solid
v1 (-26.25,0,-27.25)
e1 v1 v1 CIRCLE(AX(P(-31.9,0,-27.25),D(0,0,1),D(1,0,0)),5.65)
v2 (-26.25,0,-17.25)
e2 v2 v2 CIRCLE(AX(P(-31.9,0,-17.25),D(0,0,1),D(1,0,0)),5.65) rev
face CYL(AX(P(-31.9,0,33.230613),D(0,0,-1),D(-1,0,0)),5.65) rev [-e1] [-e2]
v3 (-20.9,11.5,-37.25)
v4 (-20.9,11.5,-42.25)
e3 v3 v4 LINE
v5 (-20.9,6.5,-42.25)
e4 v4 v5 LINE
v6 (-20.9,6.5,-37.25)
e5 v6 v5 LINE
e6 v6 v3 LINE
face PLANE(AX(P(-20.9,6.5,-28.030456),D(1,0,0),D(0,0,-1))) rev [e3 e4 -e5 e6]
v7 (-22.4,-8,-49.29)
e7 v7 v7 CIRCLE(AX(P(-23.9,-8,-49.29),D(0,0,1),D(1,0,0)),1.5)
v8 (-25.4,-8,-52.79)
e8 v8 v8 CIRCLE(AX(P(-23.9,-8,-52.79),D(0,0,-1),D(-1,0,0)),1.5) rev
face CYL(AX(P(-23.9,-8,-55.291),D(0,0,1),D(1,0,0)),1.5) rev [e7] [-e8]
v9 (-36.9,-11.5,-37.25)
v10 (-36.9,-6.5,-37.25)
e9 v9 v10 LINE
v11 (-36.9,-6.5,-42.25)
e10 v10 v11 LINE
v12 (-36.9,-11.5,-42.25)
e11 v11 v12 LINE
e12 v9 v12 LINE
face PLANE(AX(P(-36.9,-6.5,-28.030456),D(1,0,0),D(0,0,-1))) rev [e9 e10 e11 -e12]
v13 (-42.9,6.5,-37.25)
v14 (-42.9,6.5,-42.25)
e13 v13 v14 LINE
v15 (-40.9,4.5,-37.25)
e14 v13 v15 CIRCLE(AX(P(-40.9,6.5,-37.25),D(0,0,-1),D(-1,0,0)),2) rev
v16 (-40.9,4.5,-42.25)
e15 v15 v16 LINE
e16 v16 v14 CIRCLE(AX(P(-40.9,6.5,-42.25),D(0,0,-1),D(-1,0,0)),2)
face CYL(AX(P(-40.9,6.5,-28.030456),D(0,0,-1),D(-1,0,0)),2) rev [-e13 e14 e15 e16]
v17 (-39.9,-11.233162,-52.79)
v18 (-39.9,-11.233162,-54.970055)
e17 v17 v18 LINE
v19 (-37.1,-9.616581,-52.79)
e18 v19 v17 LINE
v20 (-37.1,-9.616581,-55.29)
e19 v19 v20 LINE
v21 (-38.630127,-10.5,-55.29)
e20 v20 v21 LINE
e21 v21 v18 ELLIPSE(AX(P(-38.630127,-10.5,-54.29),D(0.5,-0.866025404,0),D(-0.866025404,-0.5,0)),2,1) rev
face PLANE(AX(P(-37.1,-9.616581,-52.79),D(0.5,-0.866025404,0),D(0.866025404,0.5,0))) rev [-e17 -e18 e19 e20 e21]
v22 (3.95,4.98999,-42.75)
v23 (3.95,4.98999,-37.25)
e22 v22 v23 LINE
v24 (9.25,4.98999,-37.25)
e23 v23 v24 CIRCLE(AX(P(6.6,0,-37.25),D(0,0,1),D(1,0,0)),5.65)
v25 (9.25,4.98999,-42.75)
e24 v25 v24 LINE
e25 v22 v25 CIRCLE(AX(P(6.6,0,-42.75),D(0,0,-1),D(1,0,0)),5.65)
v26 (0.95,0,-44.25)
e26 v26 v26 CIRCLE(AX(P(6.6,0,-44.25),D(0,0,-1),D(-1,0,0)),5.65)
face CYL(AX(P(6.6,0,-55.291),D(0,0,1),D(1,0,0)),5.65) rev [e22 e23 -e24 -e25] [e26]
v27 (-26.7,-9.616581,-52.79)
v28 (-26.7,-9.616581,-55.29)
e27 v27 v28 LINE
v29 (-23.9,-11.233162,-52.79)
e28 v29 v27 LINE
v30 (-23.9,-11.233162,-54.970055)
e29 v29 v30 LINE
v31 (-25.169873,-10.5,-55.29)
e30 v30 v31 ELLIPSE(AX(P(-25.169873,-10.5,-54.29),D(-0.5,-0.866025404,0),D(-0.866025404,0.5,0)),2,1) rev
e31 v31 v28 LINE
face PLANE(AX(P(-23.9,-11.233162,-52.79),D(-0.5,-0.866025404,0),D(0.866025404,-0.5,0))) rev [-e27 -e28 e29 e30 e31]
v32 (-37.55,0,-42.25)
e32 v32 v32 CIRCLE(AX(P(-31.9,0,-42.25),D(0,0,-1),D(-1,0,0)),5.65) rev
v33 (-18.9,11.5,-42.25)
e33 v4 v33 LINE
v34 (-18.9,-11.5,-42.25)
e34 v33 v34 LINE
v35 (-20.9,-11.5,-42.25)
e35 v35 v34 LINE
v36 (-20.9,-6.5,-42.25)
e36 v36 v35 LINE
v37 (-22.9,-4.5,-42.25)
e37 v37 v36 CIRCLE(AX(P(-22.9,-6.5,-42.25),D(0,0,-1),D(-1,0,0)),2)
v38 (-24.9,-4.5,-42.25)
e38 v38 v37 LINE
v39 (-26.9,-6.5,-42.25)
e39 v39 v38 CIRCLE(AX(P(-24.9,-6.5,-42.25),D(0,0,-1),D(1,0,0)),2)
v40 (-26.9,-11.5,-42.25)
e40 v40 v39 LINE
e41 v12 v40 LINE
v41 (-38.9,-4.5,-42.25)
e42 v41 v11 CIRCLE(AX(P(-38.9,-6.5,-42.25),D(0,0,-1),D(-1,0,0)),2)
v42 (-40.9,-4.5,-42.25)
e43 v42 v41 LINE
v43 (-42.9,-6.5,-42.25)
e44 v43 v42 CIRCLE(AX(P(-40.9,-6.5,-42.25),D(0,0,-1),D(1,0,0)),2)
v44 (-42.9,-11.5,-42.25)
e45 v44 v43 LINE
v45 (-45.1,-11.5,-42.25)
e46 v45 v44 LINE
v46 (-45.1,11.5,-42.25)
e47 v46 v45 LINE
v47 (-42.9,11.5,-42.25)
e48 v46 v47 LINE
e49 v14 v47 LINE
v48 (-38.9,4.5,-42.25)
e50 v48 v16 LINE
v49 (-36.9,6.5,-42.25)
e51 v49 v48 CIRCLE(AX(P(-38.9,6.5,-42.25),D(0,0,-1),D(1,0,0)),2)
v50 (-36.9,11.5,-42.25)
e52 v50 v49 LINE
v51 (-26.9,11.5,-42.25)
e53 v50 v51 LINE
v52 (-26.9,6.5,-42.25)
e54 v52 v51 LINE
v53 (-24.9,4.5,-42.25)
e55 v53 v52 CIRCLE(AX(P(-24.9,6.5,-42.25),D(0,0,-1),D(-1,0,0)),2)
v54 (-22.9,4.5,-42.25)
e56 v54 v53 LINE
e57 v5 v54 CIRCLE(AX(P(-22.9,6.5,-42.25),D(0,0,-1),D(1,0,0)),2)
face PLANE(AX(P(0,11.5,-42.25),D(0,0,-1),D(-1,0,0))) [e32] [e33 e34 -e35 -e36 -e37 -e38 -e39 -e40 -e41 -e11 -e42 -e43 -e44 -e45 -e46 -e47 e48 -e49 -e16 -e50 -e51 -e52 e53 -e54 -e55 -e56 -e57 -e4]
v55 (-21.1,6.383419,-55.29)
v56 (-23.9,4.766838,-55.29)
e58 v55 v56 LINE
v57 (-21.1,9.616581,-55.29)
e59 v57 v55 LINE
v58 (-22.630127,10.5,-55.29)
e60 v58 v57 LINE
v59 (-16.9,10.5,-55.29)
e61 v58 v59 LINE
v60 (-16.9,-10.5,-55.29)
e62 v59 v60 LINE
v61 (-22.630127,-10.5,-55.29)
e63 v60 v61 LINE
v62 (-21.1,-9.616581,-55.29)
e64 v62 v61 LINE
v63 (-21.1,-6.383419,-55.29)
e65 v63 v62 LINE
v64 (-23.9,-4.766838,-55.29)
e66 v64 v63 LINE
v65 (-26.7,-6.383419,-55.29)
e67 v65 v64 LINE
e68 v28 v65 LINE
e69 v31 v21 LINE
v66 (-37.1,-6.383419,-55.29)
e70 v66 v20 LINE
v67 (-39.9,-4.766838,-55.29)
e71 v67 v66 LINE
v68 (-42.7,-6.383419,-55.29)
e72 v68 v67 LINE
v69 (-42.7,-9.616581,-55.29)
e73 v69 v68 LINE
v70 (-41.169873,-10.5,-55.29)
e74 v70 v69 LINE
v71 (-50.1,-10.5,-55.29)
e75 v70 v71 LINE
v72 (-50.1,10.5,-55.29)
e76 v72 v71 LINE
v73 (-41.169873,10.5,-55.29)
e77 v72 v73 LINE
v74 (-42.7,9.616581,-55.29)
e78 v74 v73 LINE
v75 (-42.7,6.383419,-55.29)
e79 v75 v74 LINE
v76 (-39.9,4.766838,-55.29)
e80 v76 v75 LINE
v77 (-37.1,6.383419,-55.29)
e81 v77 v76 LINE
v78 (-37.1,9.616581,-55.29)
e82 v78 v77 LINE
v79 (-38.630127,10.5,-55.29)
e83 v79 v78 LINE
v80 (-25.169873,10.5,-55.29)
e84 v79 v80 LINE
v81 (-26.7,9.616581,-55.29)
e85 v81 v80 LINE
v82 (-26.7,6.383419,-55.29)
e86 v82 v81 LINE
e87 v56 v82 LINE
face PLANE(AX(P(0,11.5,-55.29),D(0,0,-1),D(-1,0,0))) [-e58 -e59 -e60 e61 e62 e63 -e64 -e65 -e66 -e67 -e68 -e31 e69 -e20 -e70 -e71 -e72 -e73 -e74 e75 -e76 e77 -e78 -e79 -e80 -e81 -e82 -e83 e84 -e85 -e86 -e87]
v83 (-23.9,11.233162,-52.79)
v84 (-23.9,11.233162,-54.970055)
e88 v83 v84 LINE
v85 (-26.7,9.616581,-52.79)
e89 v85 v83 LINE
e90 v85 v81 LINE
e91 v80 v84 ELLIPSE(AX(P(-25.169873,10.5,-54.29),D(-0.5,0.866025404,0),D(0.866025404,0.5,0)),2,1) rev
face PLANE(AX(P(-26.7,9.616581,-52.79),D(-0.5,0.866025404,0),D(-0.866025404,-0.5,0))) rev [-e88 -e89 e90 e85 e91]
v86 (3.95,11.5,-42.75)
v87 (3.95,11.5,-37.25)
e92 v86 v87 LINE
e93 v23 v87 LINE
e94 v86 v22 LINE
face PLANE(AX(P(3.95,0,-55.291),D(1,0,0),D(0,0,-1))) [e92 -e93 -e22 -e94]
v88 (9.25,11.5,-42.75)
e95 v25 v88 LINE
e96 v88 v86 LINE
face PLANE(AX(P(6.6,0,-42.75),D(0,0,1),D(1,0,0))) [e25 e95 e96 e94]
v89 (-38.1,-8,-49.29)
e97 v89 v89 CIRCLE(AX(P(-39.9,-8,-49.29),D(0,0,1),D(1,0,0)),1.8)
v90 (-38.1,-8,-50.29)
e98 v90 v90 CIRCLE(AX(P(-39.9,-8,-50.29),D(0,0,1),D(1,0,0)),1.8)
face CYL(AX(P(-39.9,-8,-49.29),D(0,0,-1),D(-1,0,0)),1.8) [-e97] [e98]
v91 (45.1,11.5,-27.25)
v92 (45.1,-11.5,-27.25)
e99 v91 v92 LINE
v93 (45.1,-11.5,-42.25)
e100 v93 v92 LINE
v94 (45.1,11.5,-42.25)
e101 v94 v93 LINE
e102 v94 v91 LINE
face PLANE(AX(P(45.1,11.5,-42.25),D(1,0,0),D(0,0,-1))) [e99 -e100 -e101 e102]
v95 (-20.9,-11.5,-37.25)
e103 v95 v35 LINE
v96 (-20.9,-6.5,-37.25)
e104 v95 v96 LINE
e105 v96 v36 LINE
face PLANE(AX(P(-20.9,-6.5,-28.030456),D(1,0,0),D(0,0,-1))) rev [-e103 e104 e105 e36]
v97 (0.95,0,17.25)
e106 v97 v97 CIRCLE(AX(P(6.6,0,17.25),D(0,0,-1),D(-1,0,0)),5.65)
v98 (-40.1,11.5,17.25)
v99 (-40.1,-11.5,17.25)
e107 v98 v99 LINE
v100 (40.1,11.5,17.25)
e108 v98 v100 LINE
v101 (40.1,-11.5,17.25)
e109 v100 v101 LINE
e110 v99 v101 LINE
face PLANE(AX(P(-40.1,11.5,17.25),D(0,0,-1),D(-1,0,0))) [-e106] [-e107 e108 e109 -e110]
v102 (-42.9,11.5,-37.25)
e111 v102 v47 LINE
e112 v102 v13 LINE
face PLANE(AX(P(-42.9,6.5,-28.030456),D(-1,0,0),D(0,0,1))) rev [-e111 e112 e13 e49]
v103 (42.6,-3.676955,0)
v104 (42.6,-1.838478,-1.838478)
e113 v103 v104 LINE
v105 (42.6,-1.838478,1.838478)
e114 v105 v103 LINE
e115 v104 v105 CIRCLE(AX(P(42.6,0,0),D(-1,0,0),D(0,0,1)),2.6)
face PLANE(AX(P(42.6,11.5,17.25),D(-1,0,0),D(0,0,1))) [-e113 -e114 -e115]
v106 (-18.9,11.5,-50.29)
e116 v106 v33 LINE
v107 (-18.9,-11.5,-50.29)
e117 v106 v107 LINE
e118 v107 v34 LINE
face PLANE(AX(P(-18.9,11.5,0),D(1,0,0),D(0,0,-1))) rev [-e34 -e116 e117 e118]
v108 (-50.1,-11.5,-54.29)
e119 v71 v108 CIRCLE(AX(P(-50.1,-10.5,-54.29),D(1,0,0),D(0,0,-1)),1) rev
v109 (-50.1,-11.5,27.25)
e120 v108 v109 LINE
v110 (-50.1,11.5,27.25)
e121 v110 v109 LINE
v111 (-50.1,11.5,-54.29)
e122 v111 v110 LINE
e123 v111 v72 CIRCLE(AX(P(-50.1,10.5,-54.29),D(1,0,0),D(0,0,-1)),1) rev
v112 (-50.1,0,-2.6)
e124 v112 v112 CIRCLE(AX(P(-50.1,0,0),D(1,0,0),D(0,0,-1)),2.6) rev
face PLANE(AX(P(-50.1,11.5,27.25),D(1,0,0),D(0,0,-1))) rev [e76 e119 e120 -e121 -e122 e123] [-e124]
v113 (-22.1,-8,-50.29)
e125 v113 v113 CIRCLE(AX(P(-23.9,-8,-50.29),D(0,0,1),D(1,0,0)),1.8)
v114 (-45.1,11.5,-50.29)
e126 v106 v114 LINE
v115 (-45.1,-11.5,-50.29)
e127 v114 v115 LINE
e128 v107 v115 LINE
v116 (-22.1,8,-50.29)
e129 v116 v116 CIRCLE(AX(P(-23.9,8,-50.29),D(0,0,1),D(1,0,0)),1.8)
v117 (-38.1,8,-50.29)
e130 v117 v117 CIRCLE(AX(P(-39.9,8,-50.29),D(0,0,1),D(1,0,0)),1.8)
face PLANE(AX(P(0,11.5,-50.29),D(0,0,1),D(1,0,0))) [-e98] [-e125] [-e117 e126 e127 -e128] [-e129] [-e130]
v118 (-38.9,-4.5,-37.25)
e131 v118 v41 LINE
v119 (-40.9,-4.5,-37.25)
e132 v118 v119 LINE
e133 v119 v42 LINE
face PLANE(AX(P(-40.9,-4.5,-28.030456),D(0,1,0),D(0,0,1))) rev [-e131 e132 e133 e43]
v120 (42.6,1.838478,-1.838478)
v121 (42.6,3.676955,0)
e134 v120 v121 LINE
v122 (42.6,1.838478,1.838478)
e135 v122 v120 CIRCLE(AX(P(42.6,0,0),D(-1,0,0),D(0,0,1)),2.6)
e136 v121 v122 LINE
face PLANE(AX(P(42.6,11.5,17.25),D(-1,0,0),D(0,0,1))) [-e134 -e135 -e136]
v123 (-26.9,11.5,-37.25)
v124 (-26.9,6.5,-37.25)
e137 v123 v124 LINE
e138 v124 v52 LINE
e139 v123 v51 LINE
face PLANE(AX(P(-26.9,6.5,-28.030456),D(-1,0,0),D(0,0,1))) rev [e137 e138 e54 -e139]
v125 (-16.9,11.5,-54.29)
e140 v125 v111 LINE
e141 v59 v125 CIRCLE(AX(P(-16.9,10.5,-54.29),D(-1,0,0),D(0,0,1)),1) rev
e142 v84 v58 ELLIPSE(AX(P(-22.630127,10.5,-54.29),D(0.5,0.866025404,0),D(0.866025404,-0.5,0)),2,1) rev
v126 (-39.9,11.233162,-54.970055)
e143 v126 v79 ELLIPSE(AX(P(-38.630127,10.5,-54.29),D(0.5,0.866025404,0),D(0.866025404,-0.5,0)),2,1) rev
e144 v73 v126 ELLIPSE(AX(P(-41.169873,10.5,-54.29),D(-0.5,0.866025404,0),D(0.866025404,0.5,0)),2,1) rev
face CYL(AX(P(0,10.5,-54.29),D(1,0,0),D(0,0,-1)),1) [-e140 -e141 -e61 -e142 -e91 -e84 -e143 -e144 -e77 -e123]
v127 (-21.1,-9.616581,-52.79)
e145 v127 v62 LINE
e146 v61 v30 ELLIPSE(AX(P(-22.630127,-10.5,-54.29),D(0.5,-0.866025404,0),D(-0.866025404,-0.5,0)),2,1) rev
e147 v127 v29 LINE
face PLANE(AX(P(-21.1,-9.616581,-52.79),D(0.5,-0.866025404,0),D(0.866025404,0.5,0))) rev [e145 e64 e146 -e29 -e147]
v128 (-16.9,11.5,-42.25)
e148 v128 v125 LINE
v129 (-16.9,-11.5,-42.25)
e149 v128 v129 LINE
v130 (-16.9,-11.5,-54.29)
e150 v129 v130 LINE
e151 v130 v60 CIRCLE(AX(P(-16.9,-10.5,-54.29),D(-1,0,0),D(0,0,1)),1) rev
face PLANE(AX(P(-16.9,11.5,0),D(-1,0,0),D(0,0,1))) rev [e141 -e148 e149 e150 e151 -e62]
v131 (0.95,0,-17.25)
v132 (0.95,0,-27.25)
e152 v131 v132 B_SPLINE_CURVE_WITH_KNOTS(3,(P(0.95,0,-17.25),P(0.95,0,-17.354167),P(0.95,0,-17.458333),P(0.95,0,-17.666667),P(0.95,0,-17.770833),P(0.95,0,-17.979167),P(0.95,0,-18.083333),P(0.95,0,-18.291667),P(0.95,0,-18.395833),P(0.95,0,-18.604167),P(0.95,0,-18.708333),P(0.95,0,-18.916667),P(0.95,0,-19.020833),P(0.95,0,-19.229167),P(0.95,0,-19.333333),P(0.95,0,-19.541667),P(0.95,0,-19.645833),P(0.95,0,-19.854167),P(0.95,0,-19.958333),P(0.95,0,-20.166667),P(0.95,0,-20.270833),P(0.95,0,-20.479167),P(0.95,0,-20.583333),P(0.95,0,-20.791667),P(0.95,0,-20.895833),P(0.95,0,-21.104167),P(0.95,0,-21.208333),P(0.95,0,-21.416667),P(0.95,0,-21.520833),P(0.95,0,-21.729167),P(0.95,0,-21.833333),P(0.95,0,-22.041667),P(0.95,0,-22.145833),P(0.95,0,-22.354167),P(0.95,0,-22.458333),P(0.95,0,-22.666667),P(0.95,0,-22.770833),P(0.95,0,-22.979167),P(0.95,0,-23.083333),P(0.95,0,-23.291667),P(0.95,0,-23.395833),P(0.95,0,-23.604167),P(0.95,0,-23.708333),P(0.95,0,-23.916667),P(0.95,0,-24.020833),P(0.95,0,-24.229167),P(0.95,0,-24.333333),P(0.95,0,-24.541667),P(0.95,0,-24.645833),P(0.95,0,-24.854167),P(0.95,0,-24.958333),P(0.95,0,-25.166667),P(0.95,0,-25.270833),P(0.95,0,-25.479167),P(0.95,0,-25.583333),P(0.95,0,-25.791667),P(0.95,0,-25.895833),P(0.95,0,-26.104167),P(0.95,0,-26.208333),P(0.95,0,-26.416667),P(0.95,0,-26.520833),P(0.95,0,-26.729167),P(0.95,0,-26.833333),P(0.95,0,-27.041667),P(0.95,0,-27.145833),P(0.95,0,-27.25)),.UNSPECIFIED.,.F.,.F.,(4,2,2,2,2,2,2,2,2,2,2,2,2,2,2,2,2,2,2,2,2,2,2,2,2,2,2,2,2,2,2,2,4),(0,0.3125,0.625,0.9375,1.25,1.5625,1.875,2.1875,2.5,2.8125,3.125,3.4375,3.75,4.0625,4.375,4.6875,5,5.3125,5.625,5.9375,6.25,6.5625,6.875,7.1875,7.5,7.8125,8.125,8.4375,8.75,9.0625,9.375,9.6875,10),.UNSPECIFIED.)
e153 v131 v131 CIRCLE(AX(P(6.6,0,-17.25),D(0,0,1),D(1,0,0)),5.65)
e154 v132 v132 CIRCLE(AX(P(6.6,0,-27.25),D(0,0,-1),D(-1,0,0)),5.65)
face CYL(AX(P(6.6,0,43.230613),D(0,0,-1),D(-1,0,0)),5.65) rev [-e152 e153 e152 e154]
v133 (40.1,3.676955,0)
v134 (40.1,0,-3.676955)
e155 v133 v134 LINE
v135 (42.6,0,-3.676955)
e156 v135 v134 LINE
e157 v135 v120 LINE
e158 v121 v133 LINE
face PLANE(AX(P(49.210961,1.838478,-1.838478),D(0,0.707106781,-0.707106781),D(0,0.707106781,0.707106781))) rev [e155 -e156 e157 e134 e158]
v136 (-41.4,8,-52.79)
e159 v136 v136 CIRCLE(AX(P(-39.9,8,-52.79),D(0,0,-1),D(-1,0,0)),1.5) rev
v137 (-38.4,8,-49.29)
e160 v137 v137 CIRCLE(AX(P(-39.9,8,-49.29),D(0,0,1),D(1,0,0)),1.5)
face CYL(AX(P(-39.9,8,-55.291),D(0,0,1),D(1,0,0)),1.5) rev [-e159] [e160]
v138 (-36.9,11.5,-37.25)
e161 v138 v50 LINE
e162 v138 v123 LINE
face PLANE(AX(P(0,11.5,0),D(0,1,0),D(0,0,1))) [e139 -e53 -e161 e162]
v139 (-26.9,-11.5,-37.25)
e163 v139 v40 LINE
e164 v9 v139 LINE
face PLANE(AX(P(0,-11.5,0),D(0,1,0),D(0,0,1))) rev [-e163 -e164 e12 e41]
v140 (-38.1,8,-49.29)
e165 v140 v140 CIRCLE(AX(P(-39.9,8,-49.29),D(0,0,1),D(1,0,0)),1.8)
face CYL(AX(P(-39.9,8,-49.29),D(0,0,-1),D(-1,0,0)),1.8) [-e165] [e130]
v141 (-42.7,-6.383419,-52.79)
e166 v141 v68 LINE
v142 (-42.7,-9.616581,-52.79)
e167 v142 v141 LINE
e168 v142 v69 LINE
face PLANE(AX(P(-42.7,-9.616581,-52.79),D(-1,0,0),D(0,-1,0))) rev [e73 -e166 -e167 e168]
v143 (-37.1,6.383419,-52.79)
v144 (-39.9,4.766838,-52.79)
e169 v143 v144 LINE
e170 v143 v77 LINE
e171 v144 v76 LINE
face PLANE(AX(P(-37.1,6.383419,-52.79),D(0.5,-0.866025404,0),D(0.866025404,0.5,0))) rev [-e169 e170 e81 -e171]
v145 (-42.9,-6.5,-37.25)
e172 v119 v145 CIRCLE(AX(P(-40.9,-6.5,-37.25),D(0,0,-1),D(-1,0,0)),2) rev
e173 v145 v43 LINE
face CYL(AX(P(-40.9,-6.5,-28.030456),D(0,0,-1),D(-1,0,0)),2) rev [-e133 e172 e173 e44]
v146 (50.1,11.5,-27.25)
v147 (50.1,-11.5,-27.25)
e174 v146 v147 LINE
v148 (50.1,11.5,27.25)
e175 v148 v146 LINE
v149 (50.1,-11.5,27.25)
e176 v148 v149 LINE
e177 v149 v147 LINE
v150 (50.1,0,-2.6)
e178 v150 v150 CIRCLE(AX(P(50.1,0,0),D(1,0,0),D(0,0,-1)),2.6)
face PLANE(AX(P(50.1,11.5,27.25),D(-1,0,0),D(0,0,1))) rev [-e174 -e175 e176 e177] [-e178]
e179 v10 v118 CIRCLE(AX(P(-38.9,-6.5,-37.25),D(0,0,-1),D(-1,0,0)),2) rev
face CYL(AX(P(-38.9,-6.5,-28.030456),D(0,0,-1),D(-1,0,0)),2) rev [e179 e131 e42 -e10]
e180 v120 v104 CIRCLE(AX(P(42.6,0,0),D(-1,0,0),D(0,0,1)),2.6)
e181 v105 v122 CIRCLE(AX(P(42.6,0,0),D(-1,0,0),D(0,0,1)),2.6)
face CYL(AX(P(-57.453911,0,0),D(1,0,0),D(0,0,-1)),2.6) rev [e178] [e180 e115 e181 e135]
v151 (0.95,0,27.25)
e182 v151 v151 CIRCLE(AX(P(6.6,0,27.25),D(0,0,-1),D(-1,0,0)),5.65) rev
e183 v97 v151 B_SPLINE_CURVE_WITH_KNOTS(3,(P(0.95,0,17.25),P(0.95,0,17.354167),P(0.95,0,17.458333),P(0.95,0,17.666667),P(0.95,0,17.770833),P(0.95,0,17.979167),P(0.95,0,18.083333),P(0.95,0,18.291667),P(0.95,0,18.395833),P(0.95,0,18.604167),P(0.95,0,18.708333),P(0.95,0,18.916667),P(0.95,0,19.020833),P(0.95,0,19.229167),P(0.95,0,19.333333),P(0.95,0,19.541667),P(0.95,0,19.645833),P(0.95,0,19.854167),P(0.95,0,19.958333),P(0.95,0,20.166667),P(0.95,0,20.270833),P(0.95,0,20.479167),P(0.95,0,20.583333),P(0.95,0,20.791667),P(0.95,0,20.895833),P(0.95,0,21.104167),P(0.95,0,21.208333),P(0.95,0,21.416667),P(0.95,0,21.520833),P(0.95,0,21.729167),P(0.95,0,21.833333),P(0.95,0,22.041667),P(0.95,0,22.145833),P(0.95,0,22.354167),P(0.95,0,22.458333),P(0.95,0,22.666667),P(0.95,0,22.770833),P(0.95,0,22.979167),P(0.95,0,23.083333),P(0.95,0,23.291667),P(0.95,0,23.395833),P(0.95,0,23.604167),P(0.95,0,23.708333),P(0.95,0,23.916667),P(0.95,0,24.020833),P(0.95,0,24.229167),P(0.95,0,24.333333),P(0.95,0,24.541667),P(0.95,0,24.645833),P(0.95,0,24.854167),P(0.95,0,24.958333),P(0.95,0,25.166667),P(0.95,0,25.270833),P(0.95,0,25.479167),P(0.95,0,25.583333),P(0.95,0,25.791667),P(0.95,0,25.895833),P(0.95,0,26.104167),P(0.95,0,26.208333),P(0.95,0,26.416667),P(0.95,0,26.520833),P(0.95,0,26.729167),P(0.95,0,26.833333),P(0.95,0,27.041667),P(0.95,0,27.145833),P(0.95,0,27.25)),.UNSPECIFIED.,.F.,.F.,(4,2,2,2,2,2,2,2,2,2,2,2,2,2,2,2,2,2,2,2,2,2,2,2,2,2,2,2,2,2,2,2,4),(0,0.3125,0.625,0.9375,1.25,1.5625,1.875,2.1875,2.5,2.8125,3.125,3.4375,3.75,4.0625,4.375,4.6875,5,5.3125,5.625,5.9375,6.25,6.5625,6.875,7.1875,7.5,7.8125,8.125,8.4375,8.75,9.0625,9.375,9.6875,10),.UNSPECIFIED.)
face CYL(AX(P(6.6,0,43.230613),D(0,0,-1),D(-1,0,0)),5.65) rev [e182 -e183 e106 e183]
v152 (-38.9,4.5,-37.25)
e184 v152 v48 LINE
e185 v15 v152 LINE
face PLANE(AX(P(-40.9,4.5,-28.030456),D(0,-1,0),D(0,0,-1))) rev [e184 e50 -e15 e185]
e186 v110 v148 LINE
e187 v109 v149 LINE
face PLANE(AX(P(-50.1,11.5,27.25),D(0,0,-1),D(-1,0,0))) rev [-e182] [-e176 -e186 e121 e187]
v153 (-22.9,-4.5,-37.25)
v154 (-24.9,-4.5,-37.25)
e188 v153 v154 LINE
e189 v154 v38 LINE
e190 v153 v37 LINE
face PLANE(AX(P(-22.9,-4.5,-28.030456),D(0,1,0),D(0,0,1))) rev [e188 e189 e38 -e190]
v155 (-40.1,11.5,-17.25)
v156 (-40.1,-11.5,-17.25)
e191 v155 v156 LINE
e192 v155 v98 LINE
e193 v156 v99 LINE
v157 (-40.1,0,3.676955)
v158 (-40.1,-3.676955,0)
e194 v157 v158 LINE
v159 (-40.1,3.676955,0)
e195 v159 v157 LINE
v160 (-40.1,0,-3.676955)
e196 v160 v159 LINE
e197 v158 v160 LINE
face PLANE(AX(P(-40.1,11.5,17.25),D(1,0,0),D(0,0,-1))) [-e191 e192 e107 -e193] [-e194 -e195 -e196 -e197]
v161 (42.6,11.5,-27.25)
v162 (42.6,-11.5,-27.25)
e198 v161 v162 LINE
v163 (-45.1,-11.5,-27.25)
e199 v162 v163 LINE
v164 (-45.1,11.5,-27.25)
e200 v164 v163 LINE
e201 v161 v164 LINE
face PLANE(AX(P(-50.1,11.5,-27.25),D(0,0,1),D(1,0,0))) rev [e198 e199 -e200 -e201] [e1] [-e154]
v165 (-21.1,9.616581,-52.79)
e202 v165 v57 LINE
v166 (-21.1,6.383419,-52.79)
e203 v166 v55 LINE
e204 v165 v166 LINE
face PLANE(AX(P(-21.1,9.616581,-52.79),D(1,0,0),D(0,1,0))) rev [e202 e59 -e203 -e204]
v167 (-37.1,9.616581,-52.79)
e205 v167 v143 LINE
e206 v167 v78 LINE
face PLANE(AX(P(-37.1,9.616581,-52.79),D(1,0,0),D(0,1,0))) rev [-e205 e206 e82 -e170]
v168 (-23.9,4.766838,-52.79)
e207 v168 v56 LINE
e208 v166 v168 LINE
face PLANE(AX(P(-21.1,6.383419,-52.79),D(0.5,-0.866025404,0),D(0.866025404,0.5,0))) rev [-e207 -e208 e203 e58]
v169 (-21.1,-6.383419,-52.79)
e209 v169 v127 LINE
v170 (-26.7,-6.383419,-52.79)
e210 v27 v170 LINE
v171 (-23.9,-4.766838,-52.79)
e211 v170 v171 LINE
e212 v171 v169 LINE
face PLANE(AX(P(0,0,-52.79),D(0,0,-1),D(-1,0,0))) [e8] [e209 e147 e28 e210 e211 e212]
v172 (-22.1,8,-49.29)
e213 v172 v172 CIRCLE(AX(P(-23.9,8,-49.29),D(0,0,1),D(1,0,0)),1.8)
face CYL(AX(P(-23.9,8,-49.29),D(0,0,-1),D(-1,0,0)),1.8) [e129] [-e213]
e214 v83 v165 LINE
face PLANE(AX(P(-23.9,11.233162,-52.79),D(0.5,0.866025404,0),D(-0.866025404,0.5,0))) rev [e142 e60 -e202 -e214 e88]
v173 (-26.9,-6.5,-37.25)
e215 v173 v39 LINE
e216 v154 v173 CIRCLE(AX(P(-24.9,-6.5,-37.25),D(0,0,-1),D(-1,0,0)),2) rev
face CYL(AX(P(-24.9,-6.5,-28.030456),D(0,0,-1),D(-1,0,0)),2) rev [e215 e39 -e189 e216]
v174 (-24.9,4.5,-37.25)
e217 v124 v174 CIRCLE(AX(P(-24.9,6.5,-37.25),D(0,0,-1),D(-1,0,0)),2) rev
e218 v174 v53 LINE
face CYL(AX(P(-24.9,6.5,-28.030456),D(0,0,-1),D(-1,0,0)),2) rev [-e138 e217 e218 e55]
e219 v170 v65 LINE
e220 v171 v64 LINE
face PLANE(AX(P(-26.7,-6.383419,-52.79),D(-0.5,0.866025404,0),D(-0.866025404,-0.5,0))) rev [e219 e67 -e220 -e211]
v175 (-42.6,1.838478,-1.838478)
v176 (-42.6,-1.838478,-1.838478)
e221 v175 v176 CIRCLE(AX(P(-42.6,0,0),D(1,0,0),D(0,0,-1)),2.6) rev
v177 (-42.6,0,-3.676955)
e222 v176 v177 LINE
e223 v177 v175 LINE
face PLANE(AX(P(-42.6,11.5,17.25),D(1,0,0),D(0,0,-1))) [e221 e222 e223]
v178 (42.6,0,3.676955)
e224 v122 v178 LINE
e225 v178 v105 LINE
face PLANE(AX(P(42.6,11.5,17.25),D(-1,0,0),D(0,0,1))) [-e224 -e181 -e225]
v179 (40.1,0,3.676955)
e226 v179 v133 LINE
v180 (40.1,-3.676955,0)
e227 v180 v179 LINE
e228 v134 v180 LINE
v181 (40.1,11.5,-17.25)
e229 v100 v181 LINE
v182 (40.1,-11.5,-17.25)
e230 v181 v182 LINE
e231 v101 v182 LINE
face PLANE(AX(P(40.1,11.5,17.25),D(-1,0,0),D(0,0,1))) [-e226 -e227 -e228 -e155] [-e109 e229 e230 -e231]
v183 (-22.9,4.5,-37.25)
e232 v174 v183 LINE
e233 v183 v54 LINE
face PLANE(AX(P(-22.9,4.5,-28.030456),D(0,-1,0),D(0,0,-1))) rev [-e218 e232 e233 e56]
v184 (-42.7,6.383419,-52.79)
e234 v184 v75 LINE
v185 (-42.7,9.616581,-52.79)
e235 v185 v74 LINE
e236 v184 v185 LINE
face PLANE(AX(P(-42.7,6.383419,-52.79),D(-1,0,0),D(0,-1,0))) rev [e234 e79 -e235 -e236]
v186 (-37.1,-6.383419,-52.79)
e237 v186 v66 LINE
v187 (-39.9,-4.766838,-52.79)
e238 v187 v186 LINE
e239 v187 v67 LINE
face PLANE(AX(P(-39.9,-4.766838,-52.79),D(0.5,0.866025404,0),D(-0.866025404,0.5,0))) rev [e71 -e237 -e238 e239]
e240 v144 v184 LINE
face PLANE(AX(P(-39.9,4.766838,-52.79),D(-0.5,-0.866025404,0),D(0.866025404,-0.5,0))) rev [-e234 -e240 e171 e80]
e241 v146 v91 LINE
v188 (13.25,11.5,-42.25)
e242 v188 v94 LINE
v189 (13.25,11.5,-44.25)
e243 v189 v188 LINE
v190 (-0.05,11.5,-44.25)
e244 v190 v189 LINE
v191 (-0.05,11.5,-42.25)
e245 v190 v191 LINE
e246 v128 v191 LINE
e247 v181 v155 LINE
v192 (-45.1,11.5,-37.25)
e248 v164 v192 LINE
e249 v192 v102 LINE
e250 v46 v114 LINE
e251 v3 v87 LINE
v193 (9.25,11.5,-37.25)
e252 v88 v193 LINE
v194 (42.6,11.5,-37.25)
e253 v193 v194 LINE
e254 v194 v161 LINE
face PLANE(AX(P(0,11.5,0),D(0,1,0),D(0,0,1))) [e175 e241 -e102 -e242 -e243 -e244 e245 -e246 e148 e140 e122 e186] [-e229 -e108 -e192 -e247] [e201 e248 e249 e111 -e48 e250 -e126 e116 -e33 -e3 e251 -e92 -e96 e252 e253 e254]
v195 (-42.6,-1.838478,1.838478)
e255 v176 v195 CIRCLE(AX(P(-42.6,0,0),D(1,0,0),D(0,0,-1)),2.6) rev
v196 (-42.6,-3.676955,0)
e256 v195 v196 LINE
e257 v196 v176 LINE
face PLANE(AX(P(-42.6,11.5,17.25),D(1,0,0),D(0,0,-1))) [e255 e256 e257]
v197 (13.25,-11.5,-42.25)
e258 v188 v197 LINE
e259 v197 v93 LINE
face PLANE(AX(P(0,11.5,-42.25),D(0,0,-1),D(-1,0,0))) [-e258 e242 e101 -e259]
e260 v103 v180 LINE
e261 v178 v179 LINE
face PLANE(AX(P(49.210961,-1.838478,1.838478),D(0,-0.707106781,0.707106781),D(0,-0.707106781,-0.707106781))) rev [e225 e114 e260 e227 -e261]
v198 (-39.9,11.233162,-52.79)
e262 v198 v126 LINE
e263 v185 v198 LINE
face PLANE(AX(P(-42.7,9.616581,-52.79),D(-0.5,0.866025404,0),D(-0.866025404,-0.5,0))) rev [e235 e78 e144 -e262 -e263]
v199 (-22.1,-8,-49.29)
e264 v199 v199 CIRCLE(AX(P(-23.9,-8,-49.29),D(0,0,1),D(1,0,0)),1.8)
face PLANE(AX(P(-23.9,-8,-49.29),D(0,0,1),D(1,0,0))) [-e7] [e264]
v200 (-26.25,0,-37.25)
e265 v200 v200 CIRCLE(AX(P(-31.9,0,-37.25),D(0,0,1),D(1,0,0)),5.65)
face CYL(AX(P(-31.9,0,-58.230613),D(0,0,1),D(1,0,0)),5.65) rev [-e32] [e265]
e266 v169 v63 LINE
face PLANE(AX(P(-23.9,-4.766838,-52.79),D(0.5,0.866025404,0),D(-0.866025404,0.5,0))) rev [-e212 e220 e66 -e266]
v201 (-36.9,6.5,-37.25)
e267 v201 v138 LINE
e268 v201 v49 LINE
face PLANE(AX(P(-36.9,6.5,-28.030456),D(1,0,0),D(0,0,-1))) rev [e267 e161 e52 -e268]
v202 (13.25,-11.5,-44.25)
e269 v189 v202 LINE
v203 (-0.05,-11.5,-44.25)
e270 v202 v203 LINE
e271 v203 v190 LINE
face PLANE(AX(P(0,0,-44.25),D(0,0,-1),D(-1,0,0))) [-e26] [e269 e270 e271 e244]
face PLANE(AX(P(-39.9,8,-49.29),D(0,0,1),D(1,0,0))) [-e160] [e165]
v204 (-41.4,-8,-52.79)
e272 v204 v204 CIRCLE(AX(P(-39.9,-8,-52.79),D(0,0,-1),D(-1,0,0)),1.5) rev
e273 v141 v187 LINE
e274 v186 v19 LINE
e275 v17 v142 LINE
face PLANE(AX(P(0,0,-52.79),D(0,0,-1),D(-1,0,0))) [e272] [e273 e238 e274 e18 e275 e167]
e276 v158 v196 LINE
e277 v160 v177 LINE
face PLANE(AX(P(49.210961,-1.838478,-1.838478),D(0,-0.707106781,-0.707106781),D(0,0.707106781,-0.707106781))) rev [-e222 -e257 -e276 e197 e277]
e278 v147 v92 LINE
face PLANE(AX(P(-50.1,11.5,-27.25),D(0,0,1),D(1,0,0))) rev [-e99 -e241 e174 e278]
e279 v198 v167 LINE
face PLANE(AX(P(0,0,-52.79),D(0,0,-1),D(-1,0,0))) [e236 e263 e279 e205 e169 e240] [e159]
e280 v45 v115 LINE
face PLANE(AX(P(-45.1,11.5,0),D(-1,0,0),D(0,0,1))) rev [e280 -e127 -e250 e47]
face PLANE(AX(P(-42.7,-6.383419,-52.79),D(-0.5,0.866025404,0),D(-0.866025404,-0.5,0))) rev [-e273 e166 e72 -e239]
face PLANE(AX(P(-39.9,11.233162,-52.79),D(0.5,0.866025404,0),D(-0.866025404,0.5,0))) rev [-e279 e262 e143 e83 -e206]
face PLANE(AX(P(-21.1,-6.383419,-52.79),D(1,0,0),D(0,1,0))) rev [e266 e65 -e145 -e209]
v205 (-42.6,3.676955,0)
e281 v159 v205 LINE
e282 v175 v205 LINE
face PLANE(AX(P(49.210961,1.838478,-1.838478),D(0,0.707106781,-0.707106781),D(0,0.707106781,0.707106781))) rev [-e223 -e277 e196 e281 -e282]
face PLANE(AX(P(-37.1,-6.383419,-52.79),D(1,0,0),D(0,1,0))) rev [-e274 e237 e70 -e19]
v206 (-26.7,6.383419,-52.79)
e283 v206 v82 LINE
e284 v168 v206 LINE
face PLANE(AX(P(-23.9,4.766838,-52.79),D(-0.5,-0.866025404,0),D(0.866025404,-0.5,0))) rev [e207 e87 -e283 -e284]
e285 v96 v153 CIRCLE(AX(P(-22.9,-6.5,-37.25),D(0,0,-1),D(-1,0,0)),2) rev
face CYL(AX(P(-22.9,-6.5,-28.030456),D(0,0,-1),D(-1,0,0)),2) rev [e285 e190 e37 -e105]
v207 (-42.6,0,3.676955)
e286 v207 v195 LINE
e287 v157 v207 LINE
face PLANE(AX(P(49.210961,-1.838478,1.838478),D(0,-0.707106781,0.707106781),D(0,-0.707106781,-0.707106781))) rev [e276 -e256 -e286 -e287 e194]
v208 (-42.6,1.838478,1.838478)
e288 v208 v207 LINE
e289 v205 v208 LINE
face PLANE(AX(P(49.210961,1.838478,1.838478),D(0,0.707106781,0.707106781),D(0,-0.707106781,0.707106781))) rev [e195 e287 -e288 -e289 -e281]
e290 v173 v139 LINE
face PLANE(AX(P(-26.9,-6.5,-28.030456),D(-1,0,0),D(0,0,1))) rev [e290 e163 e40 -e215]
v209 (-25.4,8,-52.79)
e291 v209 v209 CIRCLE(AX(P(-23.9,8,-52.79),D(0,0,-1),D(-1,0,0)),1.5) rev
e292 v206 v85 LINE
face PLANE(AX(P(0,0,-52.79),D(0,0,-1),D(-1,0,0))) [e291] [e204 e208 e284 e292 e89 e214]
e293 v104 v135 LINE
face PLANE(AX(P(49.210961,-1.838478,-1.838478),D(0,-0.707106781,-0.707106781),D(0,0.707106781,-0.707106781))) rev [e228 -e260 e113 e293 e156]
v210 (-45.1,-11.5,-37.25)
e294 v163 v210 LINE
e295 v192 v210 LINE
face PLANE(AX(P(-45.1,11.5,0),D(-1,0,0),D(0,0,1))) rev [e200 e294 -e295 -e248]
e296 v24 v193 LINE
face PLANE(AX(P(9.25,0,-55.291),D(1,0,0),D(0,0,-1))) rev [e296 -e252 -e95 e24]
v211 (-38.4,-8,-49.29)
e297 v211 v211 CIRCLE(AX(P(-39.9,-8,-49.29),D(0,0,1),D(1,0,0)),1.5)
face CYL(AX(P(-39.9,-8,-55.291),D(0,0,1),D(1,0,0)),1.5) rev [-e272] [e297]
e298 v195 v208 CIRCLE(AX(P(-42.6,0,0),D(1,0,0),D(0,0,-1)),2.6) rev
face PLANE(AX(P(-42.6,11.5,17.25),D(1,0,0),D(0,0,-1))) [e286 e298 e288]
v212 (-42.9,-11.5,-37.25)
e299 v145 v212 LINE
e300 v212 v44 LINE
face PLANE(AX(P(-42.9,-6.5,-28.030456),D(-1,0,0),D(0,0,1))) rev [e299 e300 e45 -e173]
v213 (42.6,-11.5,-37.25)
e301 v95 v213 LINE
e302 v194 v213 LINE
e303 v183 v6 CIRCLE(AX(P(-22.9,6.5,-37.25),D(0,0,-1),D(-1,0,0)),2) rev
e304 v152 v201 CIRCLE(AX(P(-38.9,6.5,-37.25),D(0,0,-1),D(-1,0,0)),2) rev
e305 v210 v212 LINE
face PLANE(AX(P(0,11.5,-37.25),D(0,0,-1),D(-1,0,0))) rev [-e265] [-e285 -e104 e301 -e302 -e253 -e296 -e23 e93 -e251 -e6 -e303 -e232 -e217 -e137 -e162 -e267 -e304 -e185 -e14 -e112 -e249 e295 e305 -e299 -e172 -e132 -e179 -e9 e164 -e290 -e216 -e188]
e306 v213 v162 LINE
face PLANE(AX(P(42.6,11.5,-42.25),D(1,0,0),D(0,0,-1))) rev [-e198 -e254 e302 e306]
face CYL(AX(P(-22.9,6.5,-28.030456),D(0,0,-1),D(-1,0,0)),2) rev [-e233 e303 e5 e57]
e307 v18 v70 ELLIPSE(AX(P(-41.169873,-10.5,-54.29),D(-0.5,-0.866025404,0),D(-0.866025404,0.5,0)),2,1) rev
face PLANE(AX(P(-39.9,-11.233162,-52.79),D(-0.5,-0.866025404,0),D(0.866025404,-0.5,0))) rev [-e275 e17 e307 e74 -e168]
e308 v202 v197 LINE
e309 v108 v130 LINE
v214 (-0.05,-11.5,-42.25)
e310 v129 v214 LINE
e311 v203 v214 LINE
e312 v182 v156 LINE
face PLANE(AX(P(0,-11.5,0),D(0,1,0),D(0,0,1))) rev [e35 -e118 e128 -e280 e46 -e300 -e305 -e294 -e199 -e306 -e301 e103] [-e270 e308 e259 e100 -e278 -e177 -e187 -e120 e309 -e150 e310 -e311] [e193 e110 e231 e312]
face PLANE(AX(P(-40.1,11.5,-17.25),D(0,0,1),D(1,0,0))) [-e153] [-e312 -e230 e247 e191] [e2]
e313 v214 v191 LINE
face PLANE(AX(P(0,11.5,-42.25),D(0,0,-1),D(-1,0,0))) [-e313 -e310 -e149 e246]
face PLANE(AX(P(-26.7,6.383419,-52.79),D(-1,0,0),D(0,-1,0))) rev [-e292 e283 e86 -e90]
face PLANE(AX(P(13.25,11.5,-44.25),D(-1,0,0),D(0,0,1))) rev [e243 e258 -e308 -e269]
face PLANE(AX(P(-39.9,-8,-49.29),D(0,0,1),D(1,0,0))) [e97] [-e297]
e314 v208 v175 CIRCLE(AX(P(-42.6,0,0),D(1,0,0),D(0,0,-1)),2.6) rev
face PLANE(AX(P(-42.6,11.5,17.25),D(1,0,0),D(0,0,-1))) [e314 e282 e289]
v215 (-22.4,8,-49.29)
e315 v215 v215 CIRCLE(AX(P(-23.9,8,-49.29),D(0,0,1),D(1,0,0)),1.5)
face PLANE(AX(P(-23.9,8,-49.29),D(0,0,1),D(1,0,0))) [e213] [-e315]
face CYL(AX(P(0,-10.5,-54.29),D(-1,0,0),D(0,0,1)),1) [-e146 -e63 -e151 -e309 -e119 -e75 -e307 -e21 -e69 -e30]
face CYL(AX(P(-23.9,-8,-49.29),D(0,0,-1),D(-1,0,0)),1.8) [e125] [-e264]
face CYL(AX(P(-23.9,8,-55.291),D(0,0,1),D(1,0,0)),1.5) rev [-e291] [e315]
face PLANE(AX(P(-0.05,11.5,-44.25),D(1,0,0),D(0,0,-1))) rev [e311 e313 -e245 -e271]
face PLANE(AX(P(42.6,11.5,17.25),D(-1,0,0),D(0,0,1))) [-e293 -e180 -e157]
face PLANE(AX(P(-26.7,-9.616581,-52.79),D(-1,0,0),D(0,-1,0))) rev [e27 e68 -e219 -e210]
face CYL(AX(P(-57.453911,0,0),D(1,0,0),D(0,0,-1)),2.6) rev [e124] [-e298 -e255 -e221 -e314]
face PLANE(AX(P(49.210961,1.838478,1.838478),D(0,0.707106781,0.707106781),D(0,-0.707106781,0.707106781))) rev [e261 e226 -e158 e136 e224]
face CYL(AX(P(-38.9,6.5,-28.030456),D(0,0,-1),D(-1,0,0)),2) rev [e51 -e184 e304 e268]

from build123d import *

# Parameters (mm, degrees)
SKETCH1_W           = 100.2
SKETCH1_H           = 54.5
SKETCH1_W_2         = 80.2
SKETCH1_H_2         = 34.5
BOSS_EXTRUDE1_DEPTH = 11.5
CUT_EXTRUDE1_REACH  = 106.474
SKETCH2_R           = 2.6
CUT_EXTRUDE2_REACH  = 76.917
SKETCH3_R           = 5.65
CUT_EXTRUDE3_START  = -2.5
CUT_EXTRUDE3_DEPTH  = 85.2
SKETCH5_R           = 5.65
CUT_EXTRUDE4_DEPTH  = 10
SKETCH6_W           = 26.2
SKETCH6_H           = 8.04
BOSS_EXTRUDE2_DEPTH = 11.5
SKETCH8_R           = 1.8
BOSS_EXTRUDE3_DEPTH = 1
CUT_EXTRUDE5_REACH  = 94.199
SKETCH9_R           = 1.5
CUT_EXTRUDE6_DEPTH  = 2.5
CUT_EXTRUDE7_START  = -5
SKETCH11_R          = 5.65
CUT_EXTRUDE7_DEPTH  = 5
CUT_EXTRUDE9_REACH  = 84.477
SKETCH12_R          = 5.65
SKETCH12_W          = 5.3
SKETCH12_H          = 6.51001002
FILLET1_R           = 1
BOSS_EXTRUDE5_START = 2
SKETCH13_W          = 13.3
SKETCH13_H          = 23
SKETCH13_R          = 5.65
BOSS_EXTRUDE5_DEPTH = 2
CUT_EXTRUDE10_START = -0.5
CUT_EXTRUDE10_DEPTH = 0.5
CUT_EXTRUDE11_DEPTH = 5


with BuildPart() as part:
    # Sketch1 → Boss-Extrude1 (new, symmetric)
    with BuildSketch(Plane(origin=(0, 0, 0), x_dir=(1, 0, 0), z_dir=(0, 1, 0))):
        Rectangle(SKETCH1_W, SKETCH1_H)
        Rectangle(SKETCH1_W_2, SKETCH1_H_2, mode=Mode.SUBTRACT)
    extrude(amount=BOSS_EXTRUDE1_DEPTH, both=True)

    # Cut-Extrude1: up to this face of the body (flat: up to its plane)
    cut_extrude1_end = Plane(part.part.faces().sort_by_distance((-50.1, 0, 0))[0])
    # Sketch2 → Cut-Extrude1 (cut, up to the picked face)
    with BuildSketch(Plane(origin=(50.1, 0, 0), x_dir=(0, 0, -1), z_dir=(1, 0, 0)), mode=Mode.PRIVATE) as cut_extrude1_sk1:
        Circle(SKETCH2_R)
    cut_extrude1_tool1 = split(extrude(cut_extrude1_sk1.sketch, amount=-CUT_EXTRUDE1_REACH, mode=Mode.PRIVATE), bisect_by=cut_extrude1_end, keep=Keep.BOTH, mode=Mode.PRIVATE)
    add(cut_extrude1_tool1.solids().sort_by(Axis((50.1, 0, 0), (-1, 0, 0)))[0], mode=Mode.SUBTRACT)

    # Cut-Extrude2: up to this face of the body (flat: up to its plane)
    cut_extrude2_end = Plane(part.part.faces().sort_by_distance((0, 0, 27.25))[0])
    # Sketch3 → Cut-Extrude2 (cut, up to the picked face)
    with BuildSketch(Plane(origin=(0, 0, -27.25), x_dir=(-1, 0, 0), z_dir=(0, 0, -1)), mode=Mode.PRIVATE) as cut_extrude2_sk1:
        with Locations((-6.6, 0)):
            Circle(SKETCH3_R)
    cut_extrude2_tool1 = split(extrude(cut_extrude2_sk1.sketch, amount=-CUT_EXTRUDE2_REACH, mode=Mode.PRIVATE), bisect_by=cut_extrude2_end, keep=Keep.BOTH, mode=Mode.PRIVATE)
    add(cut_extrude2_tool1.solids().sort_by(Axis((6.6, 0, -27.25), (0, 0, 1)))[0], mode=Mode.SUBTRACT)

    # Sketch4 → Cut-Extrude3 (cut)
    with BuildSketch(Plane.ZY.offset(-40.1).offset(CUT_EXTRUDE3_START)):
        with BuildLine():
            ThreePointArc((1.838477631, -1.838477631), (-3e-09, -2.6), (-1.838477635, -1.838477627))
            Line((-1.838477635, -1.838477627), (0, -3.676955262))
            Line((0, -3.676955262), (1.838477631, -1.838477631))
        make_face()
        with BuildLine():
            ThreePointArc((-1.838477635, -1.838477627), (-2.6, 3e-09), (-1.83847763, 1.838477632))
            Line((-1.83847763, 1.838477632), (-3.676955262, 0))
            Line((-3.676955262, 0), (-1.838477635, -1.838477627))
        make_face()
        with BuildLine():
            Line((1.838477625, 1.838477637), (0, 3.676955262))
            Line((0, 3.676955262), (-1.83847763, 1.838477632))
            ThreePointArc((-1.83847763, 1.838477632), (-4e-09, 2.6), (1.838477625, 1.838477637))
        make_face()
        with BuildLine():
            Line((3.676955262, 0), (1.838477625, 1.838477637))
            ThreePointArc((1.838477625, 1.838477637), (2.402086783, 0.994976928), (2.6, 0))
            ThreePointArc((2.6, 0), (2.402086785, -0.994976924), (1.838477631, -1.838477631))
            Line((1.838477631, -1.838477631), (3.676955262, 0))
        make_face()
    extrude(amount=CUT_EXTRUDE3_DEPTH, mode=Mode.SUBTRACT)

    # Sketch5 → Cut-Extrude4 (cut)
    with BuildSketch(Plane.XY.offset(-27.25)):
        with Locations((-31.9, 0)):
            Circle(SKETCH5_R)
    extrude(amount=CUT_EXTRUDE4_DEPTH, mode=Mode.SUBTRACT)

    # Sketch6 → Boss-Extrude2 (add, symmetric)
    with BuildSketch(Plane(origin=(0, 0, 0), x_dir=(1, 0, 0), z_dir=(0, 1, 0))):
        Polygon((-16.9, 55.29), (-50.1, 55.29), (-50.1, 27.25), (-45.1, 27.25), (-45.1, 37.25), (42.6, 37.25), (42.6, 27.25), (45.1, 27.25), (45.1, 42.25), (-16.9, 42.25), align=None)
        with Locations((-32, 46.27)):
            Rectangle(SKETCH6_W, SKETCH6_H, mode=Mode.SUBTRACT)
    extrude(amount=BOSS_EXTRUDE2_DEPTH, both=True)

    # Sketch8 → Boss-Extrude3 (add)
    with BuildSketch(Plane.XY.offset(-50.29)):
        with Locations((-39.9, 8)):
            Circle(SKETCH8_R)
        with Locations((-23.9, 8)):
            Circle(SKETCH8_R)
        with Locations((-23.9, -8)):
            Circle(SKETCH8_R)
        with Locations((-39.9, -8)):
            Circle(SKETCH8_R)
    extrude(amount=BOSS_EXTRUDE3_DEPTH)

    # Sketch9 → Cut-Extrude5 (cut, up to next)
    with BuildSketch(Plane.XY.offset(-49.29), mode=Mode.PRIVATE) as cut_extrude5_sk1:
        with Locations((-39.9, 8)):
            Circle(SKETCH9_R)
    cut_extrude5_tool1 = extrude(cut_extrude5_sk1.sketch, amount=-CUT_EXTRUDE5_REACH, mode=Mode.PRIVATE) & part.part
    # Sketch9 → Cut-Extrude5 (cut, up to next)
    with BuildSketch(Plane.XY.offset(-49.29), mode=Mode.PRIVATE) as cut_extrude5_sk2:
        with Locations((-23.9, 8)):
            Circle(SKETCH9_R)
    cut_extrude5_tool2 = extrude(cut_extrude5_sk2.sketch, amount=-CUT_EXTRUDE5_REACH, mode=Mode.PRIVATE) & part.part
    # Sketch9 → Cut-Extrude5 (cut, up to next)
    with BuildSketch(Plane.XY.offset(-49.29), mode=Mode.PRIVATE) as cut_extrude5_sk3:
        with Locations((-23.9, -8)):
            Circle(SKETCH9_R)
    cut_extrude5_tool3 = extrude(cut_extrude5_sk3.sketch, amount=-CUT_EXTRUDE5_REACH, mode=Mode.PRIVATE) & part.part
    # Sketch9 → Cut-Extrude5 (cut, up to next)
    with BuildSketch(Plane.XY.offset(-49.29), mode=Mode.PRIVATE) as cut_extrude5_sk4:
        with Locations((-39.9, -8)):
            Circle(SKETCH9_R)
    cut_extrude5_tool4 = extrude(cut_extrude5_sk4.sketch, amount=-CUT_EXTRUDE5_REACH, mode=Mode.PRIVATE) & part.part
    add(cut_extrude5_tool1.solids().sort_by_distance((-39.9, 8, -49.29))[0], mode=Mode.SUBTRACT)
    add(cut_extrude5_tool2.solids().sort_by_distance((-23.9, 8, -49.29))[0], mode=Mode.SUBTRACT)
    add(cut_extrude5_tool3.solids().sort_by_distance((-23.9, -8, -49.29))[0], mode=Mode.SUBTRACT)
    add(cut_extrude5_tool4.solids().sort_by_distance((-39.9, -8, -49.29))[0], mode=Mode.SUBTRACT)

    # Sketch10 → Cut-Extrude6 (cut)
    with BuildSketch(Plane(origin=(0, 0, -55.29), x_dir=(-1, 0, 0), z_dir=(0, 0, -1))):
        Polygon((26.7, 6.383419246), (26.7, 9.616580754), (23.9, 11.233161507), (21.1, 9.616580754), (21.1, 6.383419246), (23.9, 4.766838493), align=None)
        Polygon((42.7, 6.383419246), (42.7, 9.616580754), (39.9, 11.233161507), (37.1, 9.616580754), (37.1, 6.383419246), (39.9, 4.766838493), align=None)
        Polygon((42.7, -9.616580754), (42.7, -6.383419246), (39.9, -4.766838493), (37.1, -6.383419246), (37.1, -9.616580754), (39.9, -11.233161507), align=None)
        Polygon((26.7, -9.616580754), (26.7, -6.383419246), (23.9, -4.766838493), (21.1, -6.383419246), (21.1, -9.616580754), (23.9, -11.233161507), align=None)
    extrude(amount=-CUT_EXTRUDE6_DEPTH, mode=Mode.SUBTRACT)

    # Sketch11 → Cut-Extrude7 (cut)
    with BuildSketch(Plane.XY.offset(-37.25).offset(CUT_EXTRUDE7_START)):
        with Locations((-31.9, 0)):
            Circle(SKETCH11_R)
    extrude(amount=CUT_EXTRUDE7_DEPTH, mode=Mode.SUBTRACT)

    # Sketch12 → Cut-Extrude9 (cut, up to next)
    with BuildSketch(Plane.XY.offset(-37.25), mode=Mode.PRIVATE) as cut_extrude9_sk1:
        with Locations(Location((6.6, 0, 0), (0, 0, 180))):
            Circle(SKETCH12_R)
    cut_extrude9_tool1 = extrude(cut_extrude9_sk1.sketch, amount=-CUT_EXTRUDE9_REACH, mode=Mode.PRIVATE) & part.part
    # Sketch12 → Cut-Extrude9 (cut, up to next)
    with BuildSketch(Plane.XY.offset(-37.25), mode=Mode.PRIVATE) as cut_extrude9_sk2:
        with Locations((6.6, 8.24499499)):
            Rectangle(SKETCH12_W, SKETCH12_H)
    cut_extrude9_tool2 = extrude(cut_extrude9_sk2.sketch, amount=-CUT_EXTRUDE9_REACH, mode=Mode.PRIVATE) & part.part
    add(cut_extrude9_tool1.solids().sort_by_distance((6.6, 0, -37.25))[0], mode=Mode.SUBTRACT)
    add(cut_extrude9_tool2.solids().sort_by_distance((6.6, 8.244995, -37.25))[0], mode=Mode.SUBTRACT)

    # Fillet1
    # the kernel refuses this fillet: 1 mm, written as the material it takes off along each edge
    with BuildSketch(Plane(origin=(-14.4, 11.5, -55.29), x_dir=(0, -1, 0), z_dir=(-1, 0, 0)), Plane(origin=(-14.4, -11.5, -55.29), x_dir=(0, 0, 1), z_dir=(-1, 0, 0))) as fillet1_piece_1:
        with BuildLine():
            CenterArc((FILLET1_R, FILLET1_R), FILLET1_R, 180, 90)
            Line((0, FILLET1_R), (0, 0))
            Line((0, 0), (FILLET1_R, 0))
        make_face()
    extrude(amount=38.2, mode=Mode.SUBTRACT)

    # Sketch13 → Boss-Extrude5 (add)
    with BuildSketch(Plane(origin=(0, 0, -42.25), x_dir=(-1, 0, 0), z_dir=(0, 0, -1)).offset(BOSS_EXTRUDE5_START)):
        with Locations((-6.6, 0)):
            Rectangle(SKETCH13_W, SKETCH13_H)
        with Locations((-6.6, 0)):
            Circle(SKETCH13_R, mode=Mode.SUBTRACT)
    extrude(amount=-BOSS_EXTRUDE5_DEPTH)

    # Sketch14 → Cut-Extrude10 (cut)
    with BuildSketch(Plane.XY.offset(-42.25).offset(CUT_EXTRUDE10_START)):
        with BuildLine():
            Line((3.95, 11.5), (3.95, 4.98998998))
            ThreePointArc((3.95, 4.98998998), (6.6, 5.65), (9.25, 4.98998998))
            Line((9.25, 4.98998998), (9.25, 11.5))
            Line((9.25, 11.5), (3.95, 11.5))
        make_face()
    extrude(amount=CUT_EXTRUDE10_DEPTH, mode=Mode.SUBTRACT)

    # Sketch15 → Cut-Extrude11 (cut)
    with BuildSketch(Plane(origin=(0, 0, -42.25), x_dir=(-1, 0, 0), z_dir=(0, 0, -1))):
        with BuildLine():
            Line((22.9, 4.5), (24.9, 4.5))
            ThreePointArc((24.9, 4.5), (26.314213562, 5.085786438), (26.9, 6.5))
            Line((26.9, 6.5), (26.9, 11.5))
            Line((26.9, 11.5), (20.9, 11.5))
            Line((20.9, 11.5), (20.9, 6.5))
            ThreePointArc((20.9, 6.5), (21.485786438, 5.085786438), (22.9, 4.5))
        make_face()
        with BuildLine():
            Line((40.9, 4.5), (38.9, 4.5))
            ThreePointArc((38.9, 4.5), (37.485786438, 5.085786438), (36.9, 6.5))
            Line((36.9, 6.5), (36.9, 11.5))
            Line((36.9, 11.5), (42.9, 11.5))
            Line((42.9, 11.5), (42.9, 6.5))
            ThreePointArc((42.9, 6.5), (42.314213562, 5.085786438), (40.9, 4.5))
        make_face()
        with BuildLine():
            Line((40.9, -4.5), (38.9, -4.5))
            ThreePointArc((38.9, -4.5), (37.485786438, -5.085786438), (36.9, -6.5))
            Line((36.9, -6.5), (36.9, -11.5))
            Line((36.9, -11.5), (42.9, -11.5))
            Line((42.9, -11.5), (42.9, -6.5))
            ThreePointArc((42.9, -6.5), (42.314213562, -5.085786438), (40.9, -4.5))
        make_face()
        with BuildLine():
            Line((22.9, -4.5), (24.9, -4.5))
            ThreePointArc((24.9, -4.5), (26.314213562, -5.085786438), (26.9, -6.5))
            Line((26.9, -6.5), (26.9, -11.5))
            Line((26.9, -11.5), (20.9, -11.5))
            Line((20.9, -11.5), (20.9, -6.5))
            ThreePointArc((20.9, -6.5), (21.485786438, -5.085786438), (22.9, -4.5))
        make_face()
    extrude(amount=-CUT_EXTRUDE11_DEPTH, mode=Mode.SUBTRACT)


solid = part.part
